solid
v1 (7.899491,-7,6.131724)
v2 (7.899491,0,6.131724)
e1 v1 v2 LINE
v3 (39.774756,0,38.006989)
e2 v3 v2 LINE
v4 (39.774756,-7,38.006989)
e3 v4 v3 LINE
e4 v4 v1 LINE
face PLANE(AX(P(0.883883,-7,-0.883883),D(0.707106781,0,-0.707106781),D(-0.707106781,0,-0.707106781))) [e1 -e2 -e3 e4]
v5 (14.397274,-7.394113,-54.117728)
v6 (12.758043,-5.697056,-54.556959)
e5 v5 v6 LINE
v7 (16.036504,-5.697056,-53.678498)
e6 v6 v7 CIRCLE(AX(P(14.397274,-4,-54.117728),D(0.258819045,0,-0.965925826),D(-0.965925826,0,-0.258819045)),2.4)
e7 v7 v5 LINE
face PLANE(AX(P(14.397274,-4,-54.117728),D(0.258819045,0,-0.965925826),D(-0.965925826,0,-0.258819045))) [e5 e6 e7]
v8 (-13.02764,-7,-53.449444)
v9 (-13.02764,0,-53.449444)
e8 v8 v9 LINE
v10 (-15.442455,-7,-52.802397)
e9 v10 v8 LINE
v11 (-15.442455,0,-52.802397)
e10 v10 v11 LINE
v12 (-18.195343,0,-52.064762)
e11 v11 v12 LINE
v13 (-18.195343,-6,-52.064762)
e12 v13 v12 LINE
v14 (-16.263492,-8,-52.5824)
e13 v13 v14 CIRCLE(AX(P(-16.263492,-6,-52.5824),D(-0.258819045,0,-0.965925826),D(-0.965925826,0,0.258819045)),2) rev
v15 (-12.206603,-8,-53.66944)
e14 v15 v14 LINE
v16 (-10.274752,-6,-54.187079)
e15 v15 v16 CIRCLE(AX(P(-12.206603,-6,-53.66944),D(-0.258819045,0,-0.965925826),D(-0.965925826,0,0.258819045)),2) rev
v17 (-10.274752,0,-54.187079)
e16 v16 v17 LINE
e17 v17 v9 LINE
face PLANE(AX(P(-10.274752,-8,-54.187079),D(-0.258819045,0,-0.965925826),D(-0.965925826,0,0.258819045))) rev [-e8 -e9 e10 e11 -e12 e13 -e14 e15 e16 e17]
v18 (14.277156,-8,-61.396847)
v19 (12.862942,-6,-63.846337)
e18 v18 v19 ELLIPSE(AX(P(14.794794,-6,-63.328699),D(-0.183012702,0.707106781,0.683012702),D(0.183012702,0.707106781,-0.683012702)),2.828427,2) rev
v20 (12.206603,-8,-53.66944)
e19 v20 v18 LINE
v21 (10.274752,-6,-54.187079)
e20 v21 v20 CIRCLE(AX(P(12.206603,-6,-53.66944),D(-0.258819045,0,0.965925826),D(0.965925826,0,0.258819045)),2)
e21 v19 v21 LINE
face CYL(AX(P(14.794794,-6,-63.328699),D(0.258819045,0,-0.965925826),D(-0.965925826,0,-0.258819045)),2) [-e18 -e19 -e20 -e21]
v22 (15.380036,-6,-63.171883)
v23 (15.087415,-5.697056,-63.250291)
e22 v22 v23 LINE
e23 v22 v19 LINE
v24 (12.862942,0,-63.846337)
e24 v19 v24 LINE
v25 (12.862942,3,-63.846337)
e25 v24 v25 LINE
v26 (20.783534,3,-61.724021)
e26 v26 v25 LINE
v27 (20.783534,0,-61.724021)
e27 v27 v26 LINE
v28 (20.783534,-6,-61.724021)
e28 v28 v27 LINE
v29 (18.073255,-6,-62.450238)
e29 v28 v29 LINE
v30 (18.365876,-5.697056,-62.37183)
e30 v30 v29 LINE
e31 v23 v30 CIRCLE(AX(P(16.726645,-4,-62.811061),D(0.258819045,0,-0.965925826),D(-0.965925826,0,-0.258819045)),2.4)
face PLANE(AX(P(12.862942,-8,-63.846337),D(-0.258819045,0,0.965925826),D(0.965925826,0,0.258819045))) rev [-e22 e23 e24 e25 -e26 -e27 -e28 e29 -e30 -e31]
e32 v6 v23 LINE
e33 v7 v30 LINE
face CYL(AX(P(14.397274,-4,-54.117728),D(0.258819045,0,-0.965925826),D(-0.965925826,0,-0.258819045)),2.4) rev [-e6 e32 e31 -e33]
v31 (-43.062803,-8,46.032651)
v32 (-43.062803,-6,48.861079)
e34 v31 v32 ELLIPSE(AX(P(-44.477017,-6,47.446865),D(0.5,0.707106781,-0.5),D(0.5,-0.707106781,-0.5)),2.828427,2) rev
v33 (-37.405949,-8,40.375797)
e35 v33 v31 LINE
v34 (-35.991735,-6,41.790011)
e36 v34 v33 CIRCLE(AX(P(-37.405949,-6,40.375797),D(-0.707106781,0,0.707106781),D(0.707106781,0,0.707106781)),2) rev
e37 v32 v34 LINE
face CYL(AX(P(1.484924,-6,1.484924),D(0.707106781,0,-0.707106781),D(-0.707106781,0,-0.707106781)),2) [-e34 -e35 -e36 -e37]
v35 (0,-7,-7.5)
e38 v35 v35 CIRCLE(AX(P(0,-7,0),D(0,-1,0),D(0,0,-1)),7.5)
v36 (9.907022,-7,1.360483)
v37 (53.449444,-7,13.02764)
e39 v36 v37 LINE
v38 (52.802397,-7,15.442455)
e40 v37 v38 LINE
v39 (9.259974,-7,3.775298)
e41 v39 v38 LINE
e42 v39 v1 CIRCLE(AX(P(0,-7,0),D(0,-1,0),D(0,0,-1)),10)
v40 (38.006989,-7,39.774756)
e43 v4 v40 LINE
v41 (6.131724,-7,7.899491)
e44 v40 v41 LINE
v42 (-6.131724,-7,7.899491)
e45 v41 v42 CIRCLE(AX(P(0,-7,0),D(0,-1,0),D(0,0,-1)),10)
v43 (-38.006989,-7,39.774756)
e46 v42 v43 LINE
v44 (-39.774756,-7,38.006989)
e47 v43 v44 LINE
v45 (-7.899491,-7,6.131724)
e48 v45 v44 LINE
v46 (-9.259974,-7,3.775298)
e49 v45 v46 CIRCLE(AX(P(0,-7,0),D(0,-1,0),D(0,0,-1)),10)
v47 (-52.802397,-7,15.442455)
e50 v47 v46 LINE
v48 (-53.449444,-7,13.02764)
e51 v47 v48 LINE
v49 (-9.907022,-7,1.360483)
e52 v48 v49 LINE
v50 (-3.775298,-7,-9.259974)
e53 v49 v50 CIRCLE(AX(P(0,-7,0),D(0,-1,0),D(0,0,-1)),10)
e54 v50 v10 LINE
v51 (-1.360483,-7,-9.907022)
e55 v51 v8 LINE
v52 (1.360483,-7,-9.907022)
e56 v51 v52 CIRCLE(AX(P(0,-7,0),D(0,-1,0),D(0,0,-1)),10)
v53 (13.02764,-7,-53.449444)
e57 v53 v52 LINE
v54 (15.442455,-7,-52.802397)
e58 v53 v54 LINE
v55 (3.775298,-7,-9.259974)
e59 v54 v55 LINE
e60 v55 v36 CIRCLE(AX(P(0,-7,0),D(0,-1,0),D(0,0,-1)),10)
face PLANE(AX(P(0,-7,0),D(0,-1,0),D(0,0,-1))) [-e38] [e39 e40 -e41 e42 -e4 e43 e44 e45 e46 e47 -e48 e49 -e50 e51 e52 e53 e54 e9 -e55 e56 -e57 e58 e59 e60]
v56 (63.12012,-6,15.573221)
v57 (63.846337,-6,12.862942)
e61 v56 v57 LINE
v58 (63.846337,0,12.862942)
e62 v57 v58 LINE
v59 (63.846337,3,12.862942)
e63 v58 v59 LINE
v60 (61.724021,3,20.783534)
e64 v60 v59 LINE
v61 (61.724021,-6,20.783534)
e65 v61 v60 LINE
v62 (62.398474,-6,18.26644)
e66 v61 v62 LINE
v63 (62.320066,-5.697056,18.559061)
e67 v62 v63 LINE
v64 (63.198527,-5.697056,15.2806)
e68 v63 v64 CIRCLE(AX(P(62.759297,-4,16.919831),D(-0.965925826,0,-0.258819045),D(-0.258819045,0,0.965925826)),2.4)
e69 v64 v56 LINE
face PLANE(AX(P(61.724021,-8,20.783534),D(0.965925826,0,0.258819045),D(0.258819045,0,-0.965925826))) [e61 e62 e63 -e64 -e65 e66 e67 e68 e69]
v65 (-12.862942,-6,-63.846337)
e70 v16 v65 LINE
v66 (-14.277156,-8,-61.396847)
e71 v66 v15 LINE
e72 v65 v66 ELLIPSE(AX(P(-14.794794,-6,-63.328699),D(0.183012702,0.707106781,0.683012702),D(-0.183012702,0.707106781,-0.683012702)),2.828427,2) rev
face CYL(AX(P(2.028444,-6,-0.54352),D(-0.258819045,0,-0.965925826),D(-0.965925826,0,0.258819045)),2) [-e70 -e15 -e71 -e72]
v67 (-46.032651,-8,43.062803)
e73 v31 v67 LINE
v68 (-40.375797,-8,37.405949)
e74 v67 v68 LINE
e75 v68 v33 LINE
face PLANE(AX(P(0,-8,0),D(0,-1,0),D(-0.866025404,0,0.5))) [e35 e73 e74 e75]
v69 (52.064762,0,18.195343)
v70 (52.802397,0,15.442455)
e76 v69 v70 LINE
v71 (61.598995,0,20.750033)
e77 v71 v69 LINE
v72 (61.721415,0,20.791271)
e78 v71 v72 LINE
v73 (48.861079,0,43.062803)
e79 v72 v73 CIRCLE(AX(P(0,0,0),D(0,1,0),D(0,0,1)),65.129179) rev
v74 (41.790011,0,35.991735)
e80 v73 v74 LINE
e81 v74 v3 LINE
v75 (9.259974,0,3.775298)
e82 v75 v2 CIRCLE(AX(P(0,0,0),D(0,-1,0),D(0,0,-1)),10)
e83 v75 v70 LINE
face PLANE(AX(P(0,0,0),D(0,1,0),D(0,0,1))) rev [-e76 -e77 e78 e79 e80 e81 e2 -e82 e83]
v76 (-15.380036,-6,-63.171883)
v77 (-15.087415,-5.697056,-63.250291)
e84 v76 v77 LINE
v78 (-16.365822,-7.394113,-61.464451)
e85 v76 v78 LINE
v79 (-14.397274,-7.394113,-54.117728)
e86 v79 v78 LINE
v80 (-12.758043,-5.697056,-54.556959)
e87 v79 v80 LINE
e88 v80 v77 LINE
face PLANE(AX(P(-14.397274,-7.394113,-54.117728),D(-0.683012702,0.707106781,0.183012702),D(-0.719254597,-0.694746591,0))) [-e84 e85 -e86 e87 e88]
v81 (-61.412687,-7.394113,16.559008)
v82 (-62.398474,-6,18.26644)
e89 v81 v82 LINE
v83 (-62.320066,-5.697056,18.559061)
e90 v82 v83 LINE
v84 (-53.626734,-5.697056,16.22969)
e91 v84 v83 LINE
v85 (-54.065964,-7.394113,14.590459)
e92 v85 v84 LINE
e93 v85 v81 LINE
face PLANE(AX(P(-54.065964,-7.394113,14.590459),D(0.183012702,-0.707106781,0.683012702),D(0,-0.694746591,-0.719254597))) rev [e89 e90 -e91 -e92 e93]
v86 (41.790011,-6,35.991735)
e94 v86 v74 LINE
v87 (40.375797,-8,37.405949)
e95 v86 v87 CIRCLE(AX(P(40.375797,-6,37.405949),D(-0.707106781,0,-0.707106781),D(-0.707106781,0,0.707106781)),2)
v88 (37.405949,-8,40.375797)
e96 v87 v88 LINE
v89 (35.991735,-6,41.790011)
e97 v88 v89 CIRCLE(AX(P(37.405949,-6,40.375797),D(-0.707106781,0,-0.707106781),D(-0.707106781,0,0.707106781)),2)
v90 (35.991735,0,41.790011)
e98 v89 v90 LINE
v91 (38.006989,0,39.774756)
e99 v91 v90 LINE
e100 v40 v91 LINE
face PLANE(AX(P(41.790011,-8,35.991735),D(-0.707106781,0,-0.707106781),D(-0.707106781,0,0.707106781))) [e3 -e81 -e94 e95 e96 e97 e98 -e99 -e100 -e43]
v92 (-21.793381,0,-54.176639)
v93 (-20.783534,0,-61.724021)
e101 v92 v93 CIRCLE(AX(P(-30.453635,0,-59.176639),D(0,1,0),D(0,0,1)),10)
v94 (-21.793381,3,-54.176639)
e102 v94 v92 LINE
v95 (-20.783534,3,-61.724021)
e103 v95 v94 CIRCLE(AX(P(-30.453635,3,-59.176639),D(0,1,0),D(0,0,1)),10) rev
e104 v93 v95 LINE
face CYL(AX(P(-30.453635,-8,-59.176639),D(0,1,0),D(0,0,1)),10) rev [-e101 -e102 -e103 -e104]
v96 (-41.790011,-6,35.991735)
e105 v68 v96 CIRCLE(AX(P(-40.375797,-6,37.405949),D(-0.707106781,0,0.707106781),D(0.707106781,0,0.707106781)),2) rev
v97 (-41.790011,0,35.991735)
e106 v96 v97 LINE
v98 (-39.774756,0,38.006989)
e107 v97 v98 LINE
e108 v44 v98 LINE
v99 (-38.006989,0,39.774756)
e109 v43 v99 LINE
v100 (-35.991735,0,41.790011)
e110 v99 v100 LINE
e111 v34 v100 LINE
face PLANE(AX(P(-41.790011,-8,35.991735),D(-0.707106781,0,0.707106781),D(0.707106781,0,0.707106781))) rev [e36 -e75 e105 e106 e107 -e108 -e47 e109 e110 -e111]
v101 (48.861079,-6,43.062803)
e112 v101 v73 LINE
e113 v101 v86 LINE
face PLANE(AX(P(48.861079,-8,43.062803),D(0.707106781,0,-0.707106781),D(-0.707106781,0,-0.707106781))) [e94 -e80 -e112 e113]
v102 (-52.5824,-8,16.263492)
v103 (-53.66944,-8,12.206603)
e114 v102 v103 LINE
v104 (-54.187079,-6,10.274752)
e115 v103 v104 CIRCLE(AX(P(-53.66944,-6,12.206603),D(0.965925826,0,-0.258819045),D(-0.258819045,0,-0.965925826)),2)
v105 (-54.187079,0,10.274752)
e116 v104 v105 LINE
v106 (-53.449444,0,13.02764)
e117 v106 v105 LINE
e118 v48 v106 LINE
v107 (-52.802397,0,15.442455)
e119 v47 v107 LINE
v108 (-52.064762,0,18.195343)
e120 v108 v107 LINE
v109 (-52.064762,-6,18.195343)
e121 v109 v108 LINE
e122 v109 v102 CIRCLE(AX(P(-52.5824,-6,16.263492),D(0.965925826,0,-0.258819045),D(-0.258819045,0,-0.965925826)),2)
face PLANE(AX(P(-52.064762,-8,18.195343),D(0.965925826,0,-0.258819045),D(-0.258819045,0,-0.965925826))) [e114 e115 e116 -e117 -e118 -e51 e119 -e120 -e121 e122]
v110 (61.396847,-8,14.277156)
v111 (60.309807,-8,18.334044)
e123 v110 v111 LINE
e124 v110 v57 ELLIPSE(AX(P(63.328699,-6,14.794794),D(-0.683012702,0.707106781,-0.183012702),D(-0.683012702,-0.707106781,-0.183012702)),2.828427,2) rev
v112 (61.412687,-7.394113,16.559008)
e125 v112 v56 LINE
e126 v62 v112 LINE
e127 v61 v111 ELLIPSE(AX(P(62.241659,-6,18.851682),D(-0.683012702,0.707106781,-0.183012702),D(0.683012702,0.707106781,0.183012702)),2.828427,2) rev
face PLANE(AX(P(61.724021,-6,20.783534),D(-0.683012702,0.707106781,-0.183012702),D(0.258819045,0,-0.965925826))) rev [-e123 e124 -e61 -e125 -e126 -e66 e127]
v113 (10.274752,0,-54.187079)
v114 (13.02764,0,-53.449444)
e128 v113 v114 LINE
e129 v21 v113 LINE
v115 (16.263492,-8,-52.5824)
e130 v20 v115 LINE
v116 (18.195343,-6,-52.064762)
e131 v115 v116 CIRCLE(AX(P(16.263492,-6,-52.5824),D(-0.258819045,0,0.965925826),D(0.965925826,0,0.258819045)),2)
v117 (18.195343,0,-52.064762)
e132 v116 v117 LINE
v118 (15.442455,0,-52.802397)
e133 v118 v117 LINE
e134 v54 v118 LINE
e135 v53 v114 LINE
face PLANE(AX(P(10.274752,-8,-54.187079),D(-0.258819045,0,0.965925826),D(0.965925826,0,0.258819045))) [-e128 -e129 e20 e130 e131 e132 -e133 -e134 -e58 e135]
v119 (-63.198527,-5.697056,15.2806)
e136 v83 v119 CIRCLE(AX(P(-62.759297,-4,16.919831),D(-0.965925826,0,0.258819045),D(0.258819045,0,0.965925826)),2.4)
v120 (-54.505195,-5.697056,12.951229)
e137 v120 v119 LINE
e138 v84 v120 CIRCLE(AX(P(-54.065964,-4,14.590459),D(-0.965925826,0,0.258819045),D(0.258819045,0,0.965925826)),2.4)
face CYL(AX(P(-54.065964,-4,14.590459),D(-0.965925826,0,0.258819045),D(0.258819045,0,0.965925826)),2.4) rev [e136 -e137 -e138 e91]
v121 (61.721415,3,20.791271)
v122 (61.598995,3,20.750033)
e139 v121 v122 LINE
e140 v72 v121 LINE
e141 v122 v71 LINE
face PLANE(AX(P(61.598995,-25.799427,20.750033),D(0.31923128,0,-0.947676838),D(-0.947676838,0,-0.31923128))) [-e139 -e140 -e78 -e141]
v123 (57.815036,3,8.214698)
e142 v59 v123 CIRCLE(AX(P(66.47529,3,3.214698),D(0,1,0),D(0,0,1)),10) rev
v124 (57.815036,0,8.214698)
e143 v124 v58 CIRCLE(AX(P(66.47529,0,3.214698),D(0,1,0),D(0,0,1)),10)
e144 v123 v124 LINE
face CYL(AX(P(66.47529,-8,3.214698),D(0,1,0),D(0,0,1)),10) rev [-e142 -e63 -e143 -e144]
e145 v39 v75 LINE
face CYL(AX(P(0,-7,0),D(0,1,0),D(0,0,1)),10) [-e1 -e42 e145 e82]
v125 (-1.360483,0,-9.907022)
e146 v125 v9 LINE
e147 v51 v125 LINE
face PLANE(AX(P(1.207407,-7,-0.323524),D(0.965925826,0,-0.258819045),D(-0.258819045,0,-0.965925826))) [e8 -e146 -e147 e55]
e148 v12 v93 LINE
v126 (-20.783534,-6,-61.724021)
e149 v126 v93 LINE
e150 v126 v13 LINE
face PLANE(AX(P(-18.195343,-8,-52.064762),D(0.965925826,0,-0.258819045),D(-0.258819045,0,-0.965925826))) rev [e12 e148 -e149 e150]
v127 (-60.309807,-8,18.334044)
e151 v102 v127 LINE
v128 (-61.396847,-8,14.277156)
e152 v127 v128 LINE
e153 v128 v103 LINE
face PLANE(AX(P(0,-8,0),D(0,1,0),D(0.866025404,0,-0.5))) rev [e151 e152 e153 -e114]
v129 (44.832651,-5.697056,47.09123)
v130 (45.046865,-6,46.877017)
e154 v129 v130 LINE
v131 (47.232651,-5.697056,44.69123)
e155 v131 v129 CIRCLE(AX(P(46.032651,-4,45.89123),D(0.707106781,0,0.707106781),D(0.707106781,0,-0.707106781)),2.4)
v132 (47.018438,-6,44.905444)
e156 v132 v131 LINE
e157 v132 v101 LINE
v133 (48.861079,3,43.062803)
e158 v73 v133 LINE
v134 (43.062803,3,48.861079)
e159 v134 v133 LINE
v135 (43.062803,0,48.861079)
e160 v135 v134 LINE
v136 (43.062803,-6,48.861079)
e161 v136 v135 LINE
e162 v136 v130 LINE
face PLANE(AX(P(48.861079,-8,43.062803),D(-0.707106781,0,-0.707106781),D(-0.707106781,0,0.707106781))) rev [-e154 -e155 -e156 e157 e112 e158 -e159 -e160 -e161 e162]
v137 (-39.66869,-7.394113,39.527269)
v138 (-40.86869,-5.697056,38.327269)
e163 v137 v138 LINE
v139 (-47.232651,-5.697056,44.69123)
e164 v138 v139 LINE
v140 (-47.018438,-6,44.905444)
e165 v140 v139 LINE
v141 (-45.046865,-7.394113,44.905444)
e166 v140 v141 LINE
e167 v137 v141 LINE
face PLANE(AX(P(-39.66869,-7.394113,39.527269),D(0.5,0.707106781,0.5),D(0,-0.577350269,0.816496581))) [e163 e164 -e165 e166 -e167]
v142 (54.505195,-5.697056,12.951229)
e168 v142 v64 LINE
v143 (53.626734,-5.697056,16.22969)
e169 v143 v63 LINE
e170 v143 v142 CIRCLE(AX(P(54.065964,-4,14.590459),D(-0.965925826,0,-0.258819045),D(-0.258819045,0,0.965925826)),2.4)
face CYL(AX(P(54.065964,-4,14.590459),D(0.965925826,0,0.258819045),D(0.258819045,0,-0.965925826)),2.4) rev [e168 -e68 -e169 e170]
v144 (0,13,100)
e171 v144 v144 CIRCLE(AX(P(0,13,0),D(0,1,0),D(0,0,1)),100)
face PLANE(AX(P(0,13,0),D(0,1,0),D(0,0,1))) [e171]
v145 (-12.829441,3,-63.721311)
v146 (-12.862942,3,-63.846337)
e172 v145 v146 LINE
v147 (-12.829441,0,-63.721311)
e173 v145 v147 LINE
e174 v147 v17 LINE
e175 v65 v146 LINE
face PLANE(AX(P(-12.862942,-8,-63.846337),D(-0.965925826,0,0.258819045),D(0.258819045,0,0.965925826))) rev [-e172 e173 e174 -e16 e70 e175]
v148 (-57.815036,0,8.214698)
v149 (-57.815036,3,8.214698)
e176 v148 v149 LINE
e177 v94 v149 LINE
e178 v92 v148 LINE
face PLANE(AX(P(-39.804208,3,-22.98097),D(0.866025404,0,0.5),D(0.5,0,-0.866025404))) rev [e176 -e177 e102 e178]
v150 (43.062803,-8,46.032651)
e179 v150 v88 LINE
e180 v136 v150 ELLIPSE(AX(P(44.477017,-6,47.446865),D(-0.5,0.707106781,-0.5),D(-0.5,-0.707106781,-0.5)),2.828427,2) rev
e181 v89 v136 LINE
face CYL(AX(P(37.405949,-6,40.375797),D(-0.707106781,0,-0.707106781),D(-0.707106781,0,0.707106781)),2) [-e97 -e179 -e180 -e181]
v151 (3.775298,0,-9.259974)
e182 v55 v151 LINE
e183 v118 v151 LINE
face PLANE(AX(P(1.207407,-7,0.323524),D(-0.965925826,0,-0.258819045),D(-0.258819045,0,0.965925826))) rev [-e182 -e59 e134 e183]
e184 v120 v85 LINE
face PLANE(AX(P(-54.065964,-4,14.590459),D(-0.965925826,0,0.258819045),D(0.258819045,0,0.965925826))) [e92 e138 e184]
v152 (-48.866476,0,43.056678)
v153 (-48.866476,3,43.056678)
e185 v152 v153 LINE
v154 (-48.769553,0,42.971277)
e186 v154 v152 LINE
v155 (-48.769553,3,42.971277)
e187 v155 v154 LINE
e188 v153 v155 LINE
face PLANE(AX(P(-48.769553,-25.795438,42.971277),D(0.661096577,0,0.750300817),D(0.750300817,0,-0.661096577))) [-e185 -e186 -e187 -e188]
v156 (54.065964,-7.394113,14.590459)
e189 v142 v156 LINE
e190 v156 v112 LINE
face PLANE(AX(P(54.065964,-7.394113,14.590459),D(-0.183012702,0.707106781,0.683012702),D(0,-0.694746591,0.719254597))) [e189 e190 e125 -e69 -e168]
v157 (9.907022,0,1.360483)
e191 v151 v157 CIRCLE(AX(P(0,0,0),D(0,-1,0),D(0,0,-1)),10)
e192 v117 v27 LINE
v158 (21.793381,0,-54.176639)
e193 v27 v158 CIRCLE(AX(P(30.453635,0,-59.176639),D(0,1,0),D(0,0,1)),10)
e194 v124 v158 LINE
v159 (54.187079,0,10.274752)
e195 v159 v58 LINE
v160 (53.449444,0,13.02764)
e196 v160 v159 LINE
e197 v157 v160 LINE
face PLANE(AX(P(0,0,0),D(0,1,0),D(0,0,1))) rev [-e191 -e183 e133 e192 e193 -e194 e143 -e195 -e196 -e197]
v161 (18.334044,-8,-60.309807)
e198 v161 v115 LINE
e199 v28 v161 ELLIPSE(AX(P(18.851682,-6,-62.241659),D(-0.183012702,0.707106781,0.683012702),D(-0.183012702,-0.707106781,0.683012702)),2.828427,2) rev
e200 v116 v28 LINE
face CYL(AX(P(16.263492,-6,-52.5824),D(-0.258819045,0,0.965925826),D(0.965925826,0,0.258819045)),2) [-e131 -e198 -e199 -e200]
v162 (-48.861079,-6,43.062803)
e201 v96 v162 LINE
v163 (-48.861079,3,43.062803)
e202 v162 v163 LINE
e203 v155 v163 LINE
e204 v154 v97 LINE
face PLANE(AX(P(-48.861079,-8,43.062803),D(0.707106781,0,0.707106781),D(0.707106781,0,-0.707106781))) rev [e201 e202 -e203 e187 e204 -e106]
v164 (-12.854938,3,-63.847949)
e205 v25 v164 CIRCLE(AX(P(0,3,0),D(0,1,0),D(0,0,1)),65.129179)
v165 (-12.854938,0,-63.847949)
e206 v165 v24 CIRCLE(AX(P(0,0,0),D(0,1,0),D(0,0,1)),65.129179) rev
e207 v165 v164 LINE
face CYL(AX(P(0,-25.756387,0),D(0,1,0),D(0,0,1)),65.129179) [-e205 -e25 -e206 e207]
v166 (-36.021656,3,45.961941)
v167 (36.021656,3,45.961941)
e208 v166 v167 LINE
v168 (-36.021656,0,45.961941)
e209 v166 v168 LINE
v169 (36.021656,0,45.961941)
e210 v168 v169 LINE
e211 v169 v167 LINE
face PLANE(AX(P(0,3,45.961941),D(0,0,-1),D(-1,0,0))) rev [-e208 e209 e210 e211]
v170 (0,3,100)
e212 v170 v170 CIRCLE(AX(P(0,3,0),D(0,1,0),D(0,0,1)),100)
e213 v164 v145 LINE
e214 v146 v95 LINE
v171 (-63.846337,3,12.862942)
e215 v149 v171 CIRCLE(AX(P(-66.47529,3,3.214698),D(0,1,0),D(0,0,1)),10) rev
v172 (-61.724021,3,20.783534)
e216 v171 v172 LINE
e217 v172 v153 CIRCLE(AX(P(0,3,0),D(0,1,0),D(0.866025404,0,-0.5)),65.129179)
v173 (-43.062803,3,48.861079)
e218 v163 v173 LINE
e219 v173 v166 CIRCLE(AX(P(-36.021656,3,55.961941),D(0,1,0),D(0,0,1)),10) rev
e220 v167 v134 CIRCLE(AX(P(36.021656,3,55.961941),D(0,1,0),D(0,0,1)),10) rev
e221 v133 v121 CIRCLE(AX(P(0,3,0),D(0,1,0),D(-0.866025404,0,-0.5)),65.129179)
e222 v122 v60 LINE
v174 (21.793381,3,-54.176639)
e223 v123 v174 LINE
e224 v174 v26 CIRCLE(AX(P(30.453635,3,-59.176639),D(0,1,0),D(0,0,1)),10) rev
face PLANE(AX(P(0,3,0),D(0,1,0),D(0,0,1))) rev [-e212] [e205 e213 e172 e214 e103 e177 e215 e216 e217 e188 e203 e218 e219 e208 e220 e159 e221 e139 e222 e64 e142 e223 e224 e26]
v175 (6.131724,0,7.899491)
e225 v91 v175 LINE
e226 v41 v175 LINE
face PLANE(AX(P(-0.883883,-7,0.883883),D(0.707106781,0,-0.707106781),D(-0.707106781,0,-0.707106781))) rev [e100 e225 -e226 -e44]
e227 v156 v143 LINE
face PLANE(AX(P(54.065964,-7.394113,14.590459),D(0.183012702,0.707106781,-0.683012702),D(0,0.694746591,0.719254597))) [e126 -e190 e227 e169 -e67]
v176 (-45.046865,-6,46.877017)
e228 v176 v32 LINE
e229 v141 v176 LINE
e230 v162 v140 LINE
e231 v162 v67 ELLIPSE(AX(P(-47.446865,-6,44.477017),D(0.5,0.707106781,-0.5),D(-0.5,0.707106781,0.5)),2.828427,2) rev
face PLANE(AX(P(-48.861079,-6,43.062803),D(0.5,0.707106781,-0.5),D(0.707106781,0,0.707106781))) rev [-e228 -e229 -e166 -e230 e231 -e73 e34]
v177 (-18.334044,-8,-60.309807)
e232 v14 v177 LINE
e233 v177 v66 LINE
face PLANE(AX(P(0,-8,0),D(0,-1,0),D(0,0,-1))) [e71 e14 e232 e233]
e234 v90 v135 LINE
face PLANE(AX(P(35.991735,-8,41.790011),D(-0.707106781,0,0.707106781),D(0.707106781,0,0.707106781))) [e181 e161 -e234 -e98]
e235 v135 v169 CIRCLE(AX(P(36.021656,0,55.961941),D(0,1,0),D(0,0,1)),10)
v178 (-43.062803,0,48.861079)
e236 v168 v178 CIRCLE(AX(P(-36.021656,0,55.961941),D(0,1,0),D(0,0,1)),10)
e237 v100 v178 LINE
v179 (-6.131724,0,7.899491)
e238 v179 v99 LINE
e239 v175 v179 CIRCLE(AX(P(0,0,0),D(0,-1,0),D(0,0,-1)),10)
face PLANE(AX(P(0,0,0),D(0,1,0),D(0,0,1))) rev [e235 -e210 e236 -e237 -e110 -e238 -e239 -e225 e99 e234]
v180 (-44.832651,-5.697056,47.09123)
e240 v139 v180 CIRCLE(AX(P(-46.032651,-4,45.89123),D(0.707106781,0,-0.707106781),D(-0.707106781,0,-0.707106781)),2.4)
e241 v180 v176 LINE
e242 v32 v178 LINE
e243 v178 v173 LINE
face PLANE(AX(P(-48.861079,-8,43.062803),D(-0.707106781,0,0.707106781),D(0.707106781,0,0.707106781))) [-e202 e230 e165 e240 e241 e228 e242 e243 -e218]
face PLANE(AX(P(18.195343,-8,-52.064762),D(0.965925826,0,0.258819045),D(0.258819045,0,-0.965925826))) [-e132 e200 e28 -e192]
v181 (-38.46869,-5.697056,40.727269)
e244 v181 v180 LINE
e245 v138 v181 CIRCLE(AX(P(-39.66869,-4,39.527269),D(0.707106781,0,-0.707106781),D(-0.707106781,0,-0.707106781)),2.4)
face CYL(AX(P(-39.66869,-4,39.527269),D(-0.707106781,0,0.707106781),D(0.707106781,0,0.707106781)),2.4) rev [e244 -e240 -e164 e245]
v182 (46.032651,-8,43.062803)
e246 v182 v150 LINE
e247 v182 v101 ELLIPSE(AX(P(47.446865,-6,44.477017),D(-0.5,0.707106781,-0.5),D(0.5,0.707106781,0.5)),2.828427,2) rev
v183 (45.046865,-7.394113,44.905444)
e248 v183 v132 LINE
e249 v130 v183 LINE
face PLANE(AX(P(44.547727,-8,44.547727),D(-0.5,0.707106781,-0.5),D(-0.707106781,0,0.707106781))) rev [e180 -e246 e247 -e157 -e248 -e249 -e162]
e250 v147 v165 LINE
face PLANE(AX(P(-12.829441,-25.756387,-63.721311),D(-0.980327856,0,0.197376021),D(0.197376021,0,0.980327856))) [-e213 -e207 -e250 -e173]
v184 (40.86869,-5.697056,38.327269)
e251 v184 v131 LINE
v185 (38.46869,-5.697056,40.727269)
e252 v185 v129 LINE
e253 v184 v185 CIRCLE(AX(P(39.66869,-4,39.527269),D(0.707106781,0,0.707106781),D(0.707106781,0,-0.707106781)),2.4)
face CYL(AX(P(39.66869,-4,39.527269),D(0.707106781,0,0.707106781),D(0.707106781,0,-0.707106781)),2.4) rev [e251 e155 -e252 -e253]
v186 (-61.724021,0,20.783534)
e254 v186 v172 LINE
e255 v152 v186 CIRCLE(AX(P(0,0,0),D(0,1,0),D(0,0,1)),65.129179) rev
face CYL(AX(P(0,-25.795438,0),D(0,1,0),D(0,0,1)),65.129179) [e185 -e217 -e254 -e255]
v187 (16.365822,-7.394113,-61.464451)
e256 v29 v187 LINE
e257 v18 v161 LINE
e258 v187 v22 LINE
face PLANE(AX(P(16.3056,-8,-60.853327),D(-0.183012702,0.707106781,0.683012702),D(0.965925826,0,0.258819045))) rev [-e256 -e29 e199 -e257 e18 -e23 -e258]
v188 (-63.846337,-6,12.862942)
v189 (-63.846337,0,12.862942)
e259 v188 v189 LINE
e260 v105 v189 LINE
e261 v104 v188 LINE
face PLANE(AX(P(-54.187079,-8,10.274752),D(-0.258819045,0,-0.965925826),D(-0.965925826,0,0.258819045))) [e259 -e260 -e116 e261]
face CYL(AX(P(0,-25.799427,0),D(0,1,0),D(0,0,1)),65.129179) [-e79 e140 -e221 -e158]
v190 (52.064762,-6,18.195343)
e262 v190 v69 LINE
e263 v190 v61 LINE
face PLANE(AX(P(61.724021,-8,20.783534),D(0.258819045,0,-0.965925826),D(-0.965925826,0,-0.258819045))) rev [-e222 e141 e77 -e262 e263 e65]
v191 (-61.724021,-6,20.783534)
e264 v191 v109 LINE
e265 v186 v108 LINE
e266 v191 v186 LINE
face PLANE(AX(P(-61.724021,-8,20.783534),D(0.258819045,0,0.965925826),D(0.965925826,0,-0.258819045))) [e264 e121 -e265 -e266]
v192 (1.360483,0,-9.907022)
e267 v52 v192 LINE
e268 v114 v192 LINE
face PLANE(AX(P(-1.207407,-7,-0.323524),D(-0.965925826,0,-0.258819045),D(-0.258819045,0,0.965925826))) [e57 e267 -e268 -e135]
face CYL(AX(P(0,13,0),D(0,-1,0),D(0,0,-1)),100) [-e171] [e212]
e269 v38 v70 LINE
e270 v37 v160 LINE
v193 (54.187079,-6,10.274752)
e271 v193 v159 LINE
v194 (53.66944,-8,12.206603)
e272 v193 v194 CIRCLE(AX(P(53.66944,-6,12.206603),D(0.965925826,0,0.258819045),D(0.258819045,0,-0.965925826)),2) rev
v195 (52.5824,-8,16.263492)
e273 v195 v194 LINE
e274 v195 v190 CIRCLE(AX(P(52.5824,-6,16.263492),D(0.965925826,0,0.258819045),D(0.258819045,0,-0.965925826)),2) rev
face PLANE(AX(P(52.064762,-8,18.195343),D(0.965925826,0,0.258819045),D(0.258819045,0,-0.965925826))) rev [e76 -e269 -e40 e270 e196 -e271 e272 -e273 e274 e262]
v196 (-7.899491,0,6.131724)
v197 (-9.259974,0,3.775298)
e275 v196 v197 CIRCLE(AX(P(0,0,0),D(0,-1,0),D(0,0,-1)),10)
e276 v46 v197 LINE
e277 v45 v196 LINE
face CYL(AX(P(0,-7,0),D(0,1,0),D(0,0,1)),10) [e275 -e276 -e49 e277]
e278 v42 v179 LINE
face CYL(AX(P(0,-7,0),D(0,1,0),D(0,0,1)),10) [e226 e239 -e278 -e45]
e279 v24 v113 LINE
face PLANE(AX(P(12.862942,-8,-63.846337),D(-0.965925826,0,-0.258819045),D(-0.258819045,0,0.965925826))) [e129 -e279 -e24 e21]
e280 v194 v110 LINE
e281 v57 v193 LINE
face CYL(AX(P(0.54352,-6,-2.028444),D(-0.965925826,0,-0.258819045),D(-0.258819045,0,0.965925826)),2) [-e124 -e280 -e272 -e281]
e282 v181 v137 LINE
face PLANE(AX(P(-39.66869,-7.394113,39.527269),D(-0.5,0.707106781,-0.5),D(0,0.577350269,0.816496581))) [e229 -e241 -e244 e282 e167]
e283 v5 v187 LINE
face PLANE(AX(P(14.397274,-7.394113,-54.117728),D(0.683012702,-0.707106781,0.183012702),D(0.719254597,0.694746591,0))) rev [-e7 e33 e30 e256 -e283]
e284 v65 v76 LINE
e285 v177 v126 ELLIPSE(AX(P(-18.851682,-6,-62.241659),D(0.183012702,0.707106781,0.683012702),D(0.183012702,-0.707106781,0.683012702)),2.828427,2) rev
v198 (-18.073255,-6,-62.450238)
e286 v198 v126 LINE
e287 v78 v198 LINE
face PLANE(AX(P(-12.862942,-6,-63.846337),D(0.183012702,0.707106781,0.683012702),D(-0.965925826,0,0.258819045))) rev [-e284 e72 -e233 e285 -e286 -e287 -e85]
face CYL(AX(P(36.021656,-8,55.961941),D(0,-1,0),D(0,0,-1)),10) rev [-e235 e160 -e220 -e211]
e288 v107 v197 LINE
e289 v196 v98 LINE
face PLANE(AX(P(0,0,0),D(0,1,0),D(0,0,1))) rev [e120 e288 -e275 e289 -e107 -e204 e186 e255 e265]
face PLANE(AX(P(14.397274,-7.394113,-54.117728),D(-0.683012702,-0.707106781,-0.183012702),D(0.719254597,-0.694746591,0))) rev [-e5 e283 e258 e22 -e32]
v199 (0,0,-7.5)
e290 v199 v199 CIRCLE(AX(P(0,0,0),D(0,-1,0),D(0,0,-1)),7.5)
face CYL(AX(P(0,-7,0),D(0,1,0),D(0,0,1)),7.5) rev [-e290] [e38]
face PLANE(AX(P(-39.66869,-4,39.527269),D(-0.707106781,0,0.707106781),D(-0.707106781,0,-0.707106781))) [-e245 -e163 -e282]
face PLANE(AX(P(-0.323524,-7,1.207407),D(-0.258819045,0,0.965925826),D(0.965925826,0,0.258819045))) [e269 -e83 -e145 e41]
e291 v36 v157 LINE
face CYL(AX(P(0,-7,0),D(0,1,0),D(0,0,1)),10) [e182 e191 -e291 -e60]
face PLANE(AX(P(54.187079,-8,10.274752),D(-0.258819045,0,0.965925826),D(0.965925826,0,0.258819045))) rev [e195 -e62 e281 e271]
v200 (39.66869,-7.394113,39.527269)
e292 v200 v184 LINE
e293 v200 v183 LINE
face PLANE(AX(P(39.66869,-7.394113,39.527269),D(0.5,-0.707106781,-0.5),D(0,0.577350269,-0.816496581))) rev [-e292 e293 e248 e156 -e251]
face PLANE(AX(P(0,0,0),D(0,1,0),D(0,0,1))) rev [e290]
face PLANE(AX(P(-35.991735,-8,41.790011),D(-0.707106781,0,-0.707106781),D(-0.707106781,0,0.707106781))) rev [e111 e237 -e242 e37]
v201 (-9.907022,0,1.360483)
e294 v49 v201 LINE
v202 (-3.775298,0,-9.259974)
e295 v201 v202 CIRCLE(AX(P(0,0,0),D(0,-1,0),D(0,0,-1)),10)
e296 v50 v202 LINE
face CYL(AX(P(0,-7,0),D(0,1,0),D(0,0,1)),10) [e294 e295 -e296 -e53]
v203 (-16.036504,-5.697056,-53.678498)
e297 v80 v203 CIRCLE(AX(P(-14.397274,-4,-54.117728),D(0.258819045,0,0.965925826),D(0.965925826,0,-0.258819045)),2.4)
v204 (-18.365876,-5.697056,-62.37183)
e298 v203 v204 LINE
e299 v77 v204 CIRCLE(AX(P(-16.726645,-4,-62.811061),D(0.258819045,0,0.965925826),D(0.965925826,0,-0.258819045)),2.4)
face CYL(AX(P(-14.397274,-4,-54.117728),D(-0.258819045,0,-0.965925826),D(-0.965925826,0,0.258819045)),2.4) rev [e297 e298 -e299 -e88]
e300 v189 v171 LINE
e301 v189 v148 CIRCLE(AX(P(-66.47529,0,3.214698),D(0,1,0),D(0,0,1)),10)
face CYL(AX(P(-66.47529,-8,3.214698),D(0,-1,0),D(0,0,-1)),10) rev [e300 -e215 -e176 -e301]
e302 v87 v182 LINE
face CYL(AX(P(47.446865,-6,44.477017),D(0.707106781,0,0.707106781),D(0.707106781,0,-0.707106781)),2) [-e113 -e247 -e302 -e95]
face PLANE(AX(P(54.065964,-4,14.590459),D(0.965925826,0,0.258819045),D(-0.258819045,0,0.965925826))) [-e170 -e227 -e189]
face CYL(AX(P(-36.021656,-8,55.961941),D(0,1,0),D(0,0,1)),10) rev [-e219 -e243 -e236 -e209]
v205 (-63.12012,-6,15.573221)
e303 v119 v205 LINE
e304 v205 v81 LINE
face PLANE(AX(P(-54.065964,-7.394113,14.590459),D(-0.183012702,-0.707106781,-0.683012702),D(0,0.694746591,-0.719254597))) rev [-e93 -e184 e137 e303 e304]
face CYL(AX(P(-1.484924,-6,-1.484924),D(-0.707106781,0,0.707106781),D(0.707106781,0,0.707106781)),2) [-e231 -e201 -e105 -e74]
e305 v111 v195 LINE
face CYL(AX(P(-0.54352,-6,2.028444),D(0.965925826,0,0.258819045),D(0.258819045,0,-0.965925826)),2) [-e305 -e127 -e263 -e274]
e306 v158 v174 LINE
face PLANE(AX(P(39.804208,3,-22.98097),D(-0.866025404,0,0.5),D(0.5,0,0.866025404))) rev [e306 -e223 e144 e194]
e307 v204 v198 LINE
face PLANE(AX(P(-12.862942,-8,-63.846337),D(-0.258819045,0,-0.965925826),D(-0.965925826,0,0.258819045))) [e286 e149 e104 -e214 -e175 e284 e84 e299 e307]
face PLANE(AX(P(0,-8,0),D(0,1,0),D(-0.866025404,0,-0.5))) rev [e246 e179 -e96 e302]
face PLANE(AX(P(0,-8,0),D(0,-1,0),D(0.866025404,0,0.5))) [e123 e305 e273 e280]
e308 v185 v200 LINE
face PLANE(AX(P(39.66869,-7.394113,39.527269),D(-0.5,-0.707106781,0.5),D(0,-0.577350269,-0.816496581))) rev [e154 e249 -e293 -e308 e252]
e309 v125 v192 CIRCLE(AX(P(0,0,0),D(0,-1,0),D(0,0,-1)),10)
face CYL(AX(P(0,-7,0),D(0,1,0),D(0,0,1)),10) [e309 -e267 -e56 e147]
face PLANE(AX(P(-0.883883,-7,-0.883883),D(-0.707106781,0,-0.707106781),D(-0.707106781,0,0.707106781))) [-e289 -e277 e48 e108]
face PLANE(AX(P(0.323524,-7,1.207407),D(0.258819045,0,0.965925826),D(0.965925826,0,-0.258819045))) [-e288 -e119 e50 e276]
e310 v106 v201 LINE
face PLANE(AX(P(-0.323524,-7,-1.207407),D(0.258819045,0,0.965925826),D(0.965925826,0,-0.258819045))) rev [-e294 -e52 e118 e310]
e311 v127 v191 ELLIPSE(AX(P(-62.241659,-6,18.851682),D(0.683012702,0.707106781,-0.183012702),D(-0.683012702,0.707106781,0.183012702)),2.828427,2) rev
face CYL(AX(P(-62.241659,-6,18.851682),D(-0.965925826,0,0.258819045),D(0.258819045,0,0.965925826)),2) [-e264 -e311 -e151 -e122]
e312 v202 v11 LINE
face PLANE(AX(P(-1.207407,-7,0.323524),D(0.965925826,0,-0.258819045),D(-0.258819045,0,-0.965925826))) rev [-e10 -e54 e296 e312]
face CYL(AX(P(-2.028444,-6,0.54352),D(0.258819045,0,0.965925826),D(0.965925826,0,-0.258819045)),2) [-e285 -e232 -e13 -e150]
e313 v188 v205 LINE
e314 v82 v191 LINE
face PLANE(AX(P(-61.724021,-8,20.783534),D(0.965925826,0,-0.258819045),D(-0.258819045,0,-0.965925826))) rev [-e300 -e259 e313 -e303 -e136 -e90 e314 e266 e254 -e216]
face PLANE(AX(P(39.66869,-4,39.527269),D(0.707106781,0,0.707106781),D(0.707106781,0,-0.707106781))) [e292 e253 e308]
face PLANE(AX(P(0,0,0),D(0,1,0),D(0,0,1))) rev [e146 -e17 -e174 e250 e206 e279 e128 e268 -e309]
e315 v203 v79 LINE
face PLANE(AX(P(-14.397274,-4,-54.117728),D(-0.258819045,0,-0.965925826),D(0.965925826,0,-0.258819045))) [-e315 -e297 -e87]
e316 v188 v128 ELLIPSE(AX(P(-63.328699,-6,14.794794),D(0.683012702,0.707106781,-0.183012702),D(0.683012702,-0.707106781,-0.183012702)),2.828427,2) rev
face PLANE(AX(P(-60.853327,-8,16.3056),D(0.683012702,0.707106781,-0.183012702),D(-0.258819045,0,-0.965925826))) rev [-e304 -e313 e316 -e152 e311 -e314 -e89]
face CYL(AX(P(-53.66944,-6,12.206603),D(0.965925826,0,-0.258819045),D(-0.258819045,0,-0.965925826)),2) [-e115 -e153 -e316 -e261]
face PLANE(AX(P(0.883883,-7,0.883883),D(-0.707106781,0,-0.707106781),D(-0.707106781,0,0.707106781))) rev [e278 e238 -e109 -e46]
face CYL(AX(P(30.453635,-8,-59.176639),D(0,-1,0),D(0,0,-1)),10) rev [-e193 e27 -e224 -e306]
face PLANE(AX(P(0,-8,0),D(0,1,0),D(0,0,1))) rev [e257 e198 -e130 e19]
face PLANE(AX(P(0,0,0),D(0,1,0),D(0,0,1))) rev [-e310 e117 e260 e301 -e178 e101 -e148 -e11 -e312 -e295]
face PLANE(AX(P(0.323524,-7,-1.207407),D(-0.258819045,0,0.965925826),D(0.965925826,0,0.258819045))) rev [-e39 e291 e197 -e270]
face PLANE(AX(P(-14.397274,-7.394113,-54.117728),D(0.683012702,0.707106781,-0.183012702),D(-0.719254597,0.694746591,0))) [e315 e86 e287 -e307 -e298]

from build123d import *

# Parameters (mm, degrees)
EXTRUDE_1_DEPTH                      = 3
EXTRUDE_3_DEPTH                      = 8
CUT_EXTRUDE_3_DEPTH                  = 9
EXTRUDE_4_DEPTH                      = 3
EXTRUDE_START                        = -3
EXTRUDE_5_DEPTH                      = 3
CHAMFER_1_SIZE                       = 2
FILLET_1_R                           = 2
PATTERN_CIRCULAR_3_COUNT             = 3
PATTERN_CIRCULAR_3_COPY_1_DEPTH      = 9
PATTERN_CIRCULAR_3_COPY_2_DEPTH      = 9
CHAMFER_1_OF_PATTERN_CIRCULAR_3_SIZE = 2
FILLET_1_OF_PATTERN_CIRCULAR_3_R     = 2
SKETCH_8_R                           = 10
SKETCH_8_R_2                         = 7.5
EXTRUDE_6_DEPTH                      = 7
FILLET_2_R                           = 10
SKETCH_11_R                          = 100
EXTRUDE_7_DEPTH                      = 10


with BuildPart() as part:
    # 草圖1 → 填料-伸長1 (new body)
    with BuildSketch(Plane(origin=(0, 0, 0), x_dir=(1, 0, 0), z_dir=(0, 1, 0))):
        Polygon((0, 0), (-16.823237932, 62.785178709), (-62.785178709, -16.823237932), align=None)
        with BuildLine():
            Line((0, 65), (0, 0))
            Line((0, 0), (16.823237932, 62.785178709))
            ThreePointArc((16.823237932, 62.785178709), (8.484202494, 64.443915989), (0, 65))
        make_face()
        with BuildLine():
            Line((-16.823237932, 62.785178709), (0, 0))
            Line((0, 0), (0, 65))
            ThreePointArc((0, 65), (-8.484202494, 64.443915989), (-16.823237932, 62.785178709))
        make_face()
        Polygon((0, 0), (62.785178709, -16.823237932), (16.823237932, 62.785178709), align=None)
        with BuildLine():
            Line((0, 0), (45.961940777, -45.961940777))
            ThreePointArc((45.961940777, -45.961940777), (56.291651246, -32.5), (62.785178709, -16.823237932))
            Line((62.785178709, -16.823237932), (0, 0))
        make_face()
        Polygon((0, 0), (0, -45.961940777), (45.961940777, -45.961940777), align=None)
        Polygon((-45.961940777, -45.961940777), (0, -45.961940777), (0, 0), align=None)
        with BuildLine():
            Line((0, 0), (-62.785178709, -16.823237932))
            ThreePointArc((-62.785178709, -16.823237932), (-56.291651246, -32.5), (-45.961940777, -45.961940777))
            Line((-45.961940777, -45.961940777), (0, 0))
        make_face()
    extrude(amount=EXTRUDE_1_DEPTH)

    # 草圖2 → 填料-伸長3 (add)
    with BuildSketch(Plane.XZ):
        Polygon((12.862942044, -63.846336794), (20.783533819, -61.724020624), (18.195343368, -52.064762361), (10.274751593, -54.187078531), align=None)
        Polygon((-10.274751593, -54.187078531), (-18.195343368, -52.064762361), (-20.783533819, -61.724020624), (-12.862942044, -63.846336794), align=None)
    extrude_3 = extrude(amount=EXTRUDE_3_DEPTH)

    # 草圖5 → 除料-伸長3 (cut)
    with BuildSketch(Plane(origin=(16.823237932, 0, -62.785178709), x_dir=(-0.9659258262890813, 0, -0.2588190451024721), z_dir=(0.2588190451024721, 0, -0.9659258262890813))):
        with BuildLine():
            Line((0.1, -7.39411255), (1.797056275, -5.697056275))
            ThreePointArc((1.797056275, -5.697056275), (0.1, -1.6), (-1.597056275, -5.697056275))
            Line((-1.597056275, -5.697056275), (0.1, -7.39411255))
        make_face()
    cut_extrude_3 = extrude(amount=-CUT_EXTRUDE_3_DEPTH, mode=Mode.SUBTRACT)

    # 鏡射1: 除料-伸長3 across plane
    add(cut_extrude_3.mirror(Plane(origin=(0, 0, 0), x_dir=(0, 0, 1), z_dir=(1, 0, 0))), mode=Mode.SUBTRACT)

    # 草圖6 → 填料-伸長4 (add)
    with BuildSketch(Plane(origin=(0, 0, 0), x_dir=(1, 0, 0), z_dir=(0, 1, 0))):
        with BuildLine():
            ThreePointArc((12.829441395, 63.72131067), (14.83372622, 63.284757773), (16.823237932, 62.785178709))
            Line((16.823237932, 62.785178709), (12.862942044, 63.846336794))
            Line((12.862942044, 63.846336794), (12.829441395, 63.72131067))
        make_face()
        Polygon((20.783533819, 61.724020624), (16.823237932, 62.785178709), (19.722375735, 57.763724736), align=None)
        with BuildLine():
            Line((-12.829441395, 63.72131067), (-12.862942044, 63.846336794))
            Line((-12.862942044, 63.846336794), (-16.823237932, 62.785178709))
            ThreePointArc((-16.823237932, 62.785178709), (-14.83372622, 63.284757773), (-12.829441395, 63.72131067))
        make_face()
        Polygon((-19.722375735, 57.763724736), (-16.823237932, 62.785178709), (-20.783533819, 61.724020624), align=None)
    extrude_4 = extrude(amount=EXTRUDE_4_DEPTH)

    # 草圖7 → 填料-伸長5 (add)
    with BuildSketch(Plane(origin=(0, 3, 0), x_dir=(1, 0, 0), z_dir=(0, 1, 0)).offset(EXTRUDE_START)):
        with BuildLine():
            Line((12.829441395, 63.72131067), (12.862942044, 63.846336794))
            ThreePointArc((12.862942044, 63.846336794), (0.00408223, 65.129179201), (-12.854938297, 63.847948764))
            Line((-12.854938297, 63.847948764), (-12.829441395, 63.72131067))
            ThreePointArc((-12.829441395, 63.72131067), (0, 65), (12.829441395, 63.72131067))
        make_face()
    extrude_5 = extrude(amount=EXTRUDE_5_DEPTH)

    # 導角1
    # the kernel refuses this chamfer: 2 mm, written as the material it takes off along each edge
    with BuildSketch(Plane(origin=(7.894832014, -8, -65.177537864), x_dir=(-0.2587211899984849, -0.027495876610586514, 0.9655606260692197), z_dir=(0.9659258262890813, 0, 0.2588190451024725))) as chamfer_1_piece_1:
        Polygon((CHAMFER_1_SIZE * 0.999621916911, -CHAMFER_1_SIZE * 0.0274958766106), (-CHAMFER_1_SIZE * 0.0274958766106, -CHAMFER_1_SIZE * 0.999621916911), (0, 0), align=None)
    extrude(amount=18.486731952, mode=Mode.SUBTRACT)
    with BuildSketch(Plane(origin=(-25.75164385, -8, -60.392819553), x_dir=(-0.007116456528607307, 0.9996219169112968, -0.0265589773346234), z_dir=(0.9659258262890822, 0, -0.25881904510246906))) as chamfer_1_piece_2:
        Polygon((CHAMFER_1_SIZE * 0.999621916911, CHAMFER_1_SIZE * 0.0274958766106), (-CHAMFER_1_SIZE * 0.0274958766106, CHAMFER_1_SIZE * 0.999621916911), (0, 0), align=None)
    extrude(amount=18.486731952, mode=Mode.SUBTRACT)

    # 圓角1
    fillet_1_edges = [part.edges().sort_by_distance(p)[0] for p in [
        (-19.230619549, -8, -55.928465666),
        (-11.310027773, -8, -58.050781836),
        (11.310027773, -8, -58.050781836),
        (19.230619549, -8, -55.928465666),
    ]]
    fillet(fillet_1_edges, radius=FILLET_1_R)

    # 環狀複製排列3: 填料-伸長3, 除料-伸長3, 填料-伸長4, 填料-伸長5 ×3 about axis
    pattern_circular_3_axis = Axis((0, 0, 0), (0, 1, 0))
    add([extrude_3.rotate(pattern_circular_3_axis, i * 360 / PATTERN_CIRCULAR_3_COUNT) for i in range(1, PATTERN_CIRCULAR_3_COUNT)])
    add([cut_extrude_3.rotate(pattern_circular_3_axis, i * 360 / PATTERN_CIRCULAR_3_COUNT) for i in range(1, PATTERN_CIRCULAR_3_COUNT)], mode=Mode.SUBTRACT)
    add([extrude_4.rotate(pattern_circular_3_axis, i * 360 / PATTERN_CIRCULAR_3_COUNT) for i in range(1, PATTERN_CIRCULAR_3_COUNT)])
    add([extrude_5.rotate(pattern_circular_3_axis, i * 360 / PATTERN_CIRCULAR_3_COUNT) for i in range(1, PATTERN_CIRCULAR_3_COUNT)])

    # 環狀複製排列3 copy 1 sketch → 環狀複製排列3 copy 1 (cut)
    with BuildSketch(Plane(origin=(-45.961940777, 0, 45.961940777), x_dir=(-0.7071067811865117, 0, -0.7071067811865832), z_dir=(-0.7071067811865832, 0, 0.7071067811865117))):
        with BuildLine():
            Line((0.1, 7.39411255), (1.797056275, 5.697056275))
            ThreePointArc((1.797056275, 5.697056275), (0.1, 1.6), (-1.597056275, 5.697056275))
            Line((-1.597056275, 5.697056275), (0.1, 7.39411255))
        make_face()
    extrude(amount=-PATTERN_CIRCULAR_3_COPY_1_DEPTH, mode=Mode.SUBTRACT)

    # 環狀複製排列3 copy 2 sketch → 環狀複製排列3 copy 2 (cut)
    with BuildSketch(Plane(origin=(62.785178709, 0, 16.823237932), x_dir=(-0.2588190451025699, 0, 0.9659258262890551), z_dir=(0.9659258262890551, 0, 0.2588190451025699))):
        with BuildLine():
            Line((0.1, 7.39411255), (1.797056275, 5.697056275))
            ThreePointArc((1.797056275, 5.697056275), (0.1, 1.6), (-1.597056275, 5.697056275))
            Line((-1.597056275, 5.697056275), (0.1, 7.39411255))
        make_face()
    extrude(amount=-PATTERN_CIRCULAR_3_COPY_2_DEPTH, mode=Mode.SUBTRACT)

    # 導角1 of 環狀複製排列3
    # the kernel refuses this chamfer: 2 mm, written as the material it takes off along each edge
    with BuildSketch(Plane(origin=(-60.392819553, -8, 25.75164385), x_dir=(-0.026558977334623094, 0.9996219169112968, 0.007116456528610167), z_dir=(-0.25881904510256887, 0, -0.9659258262890554)), Plane(origin=(-39.425894015, -8, 52.49798754), x_dir=(-0.019442520806014836, 0.9996219169112968, 0.019442520806012744), z_dir=(-0.7071067811865095, 0, -0.7071067811865857)), Plane(origin=(52.49798754, -8, 39.425894015), x_dir=(0.01944252080601648, 0.9996219169112968, 0.01944252080601455), z_dir=(-0.7071067811865125, 0, 0.7071067811865825)), Plane(origin=(65.177537864, -8, 7.894832014), x_dir=(0.026558977334623382, 0.9996219169112965, 0.007116456528610366), z_dir=(-0.258819045102573, 0, 0.9659258262890543))) as chamfer_1_of_pattern_circular_3_piece_1:
        Polygon((CHAMFER_1_OF_PATTERN_CIRCULAR_3_SIZE * 0.999621916911, CHAMFER_1_OF_PATTERN_CIRCULAR_3_SIZE * 0.0274958766106), (-CHAMFER_1_OF_PATTERN_CIRCULAR_3_SIZE * 0.0274958766106, CHAMFER_1_OF_PATTERN_CIRCULAR_3_SIZE * 0.999621916911), (0, 0), align=None)
    extrude(amount=18.486731952, mode=Mode.SUBTRACT)

    # 圓角1 of 環狀複製排列3
    fillet_1_of_pattern_circular_3_edges = [part.edges().sort_by_distance(p)[0] for p in [
        (-38.820162287, -8, 44.618437893),
        (-44.618437893, -8, 38.820162287),
        (-55.928465666, -8, 19.230619549),
        (-58.050781836, -8, 11.310027773),
        (58.050781836, -8, 11.310027773),
        (55.928465666, -8, 19.230619549),
        (44.618437893, -8, 38.820162287),
        (38.820162287, -8, 44.618437893),
    ]]
    fillet(fillet_1_of_pattern_circular_3_edges, radius=FILLET_1_OF_PATTERN_CIRCULAR_3_R)

    # 草圖8 → 填料-伸長6 (add)
    # profile 1 of 7: a face of its own
    with BuildSketch(Plane.XZ):
        with BuildLine():
            Line((-39.774756442, 38.006989489), (-7.899491077, 6.131724124))
            ThreePointArc((-7.899491077, 6.131724124), (-7.071067812, 7.071067812), (-6.131724124, 7.899491077))
            Line((-6.131724124, 7.899491077), (-38.006989489, 39.774756442))
            Line((-38.006989489, 39.774756442), (-39.774756442, 38.006989489))
        make_face()
    # profile 2 of 7: a face of its own
    with BuildSketch(Plane.XZ):
        with BuildLine():
            Line((-53.449444252, 13.027640198), (-9.907022011, 1.360483322))
            ThreePointArc((-9.907022011, 1.360483322), (-9.659258263, 2.588190451), (-9.259974398, 3.775297888))
            Line((-9.259974398, 3.775297888), (-52.80239664, 15.442454763))
            Line((-52.80239664, 15.442454763), (-53.449444252, 13.027640198))
        make_face()
    # profile 3 of 7: a face of its own
    with BuildSketch(Plane.XZ):
        with BuildLine():
            ThreePointArc((6.131724124, 7.899491077), (7.071067812, 7.071067812), (7.899491077, 6.131724124))
            Line((7.899491077, 6.131724124), (39.774756442, 38.006989489))
            Line((39.774756442, 38.006989489), (38.006989489, 39.774756442))
            Line((38.006989489, 39.774756442), (6.131724124, 7.899491077))
        make_face()
    # profile 4 of 7: a face of its own
    with BuildSketch(Plane.XZ):
        with BuildLine():
            ThreePointArc((9.259974398, 3.775297888), (9.659258263, 2.588190451), (9.907022011, 1.360483322))
            Line((9.907022011, 1.360483322), (53.449444252, 13.027640198))
            Line((53.449444252, 13.027640198), (52.80239664, 15.442454764))
            Line((52.80239664, 15.442454764), (9.259974398, 3.775297888))
        make_face()
    # profile 5 of 7: a face of its own
    with BuildSketch(Plane.XZ):
        with BuildLine():
            Line((1.360483322, -9.907022011), (13.027640198, -53.449444252))
            Line((13.027640198, -53.449444252), (15.442454764, -52.80239664))
            Line((15.442454764, -52.80239664), (3.775297888, -9.259974398))
            ThreePointArc((3.775297888, -9.259974398), (2.588190451, -9.659258263), (1.360483322, -9.907022011))
        make_face()
    # profile 6 of 7: a face of its own
    with BuildSketch(Plane.XZ):
        with BuildLine():
            Line((-13.027640198, -53.449444252), (-1.360483322, -9.907022011))
            ThreePointArc((-1.360483322, -9.907022011), (-2.588190451, -9.659258263), (-3.775297888, -9.259974398))
            Line((-3.775297888, -9.259974398), (-15.442454763, -52.80239664))
            Line((-15.442454763, -52.80239664), (-13.027640198, -53.449444252))
        make_face()
    # profile 7 of 7: a face of its own
    with BuildSketch(Plane.XZ):
        Circle(SKETCH_8_R)
        with Locations(Location((0, 0, 0), (0, 0, 270))):
            Circle(SKETCH_8_R_2, mode=Mode.SUBTRACT)
    extrude(amount=EXTRUDE_6_DEPTH)

    # 圓角2
    # the kernel refuses this fillet: 10 mm, written as the material it adds along each edge
    with BuildSketch(Plane(origin=(-59.886040906, 0, 11.801783959), x_dir=(-0.9659258262890541, 0, 0.2588190451025734), z_dir=(0, 1, 0))) as fillet_2_piece_1_section:
        with BuildLine():
            CenterArc((FILLET_2_R * 0.414213562371, -FILLET_2_R), FILLET_2_R, 90, 45)
            Line((-FILLET_2_R * 0.292893218815, -FILLET_2_R * 0.292893218813), (0, 0))
            Line((0, 0), (FILLET_2_R * 0.414213562371, 0))
        make_face()
    fillet_2_piece_1 = extrude(amount=3, mode=Mode.PRIVATE)
    fillet_2_piece_1 = split(fillet_2_piece_1, bisect_by=Plane(origin=(-64.006723661, 1.5, 12.264370105), z_dir=(0.9659258262890554, 0, -0.25881904510256887)), keep=Keep.TOP, mode=Mode.PRIVATE)
    add(fillet_2_piece_1)
    with BuildSketch(Plane(origin=(-40.163665171, 0, 45.961940777), x_dir=(-0.707106781186538, 0, 0.7071067811865569), z_dir=(0, 1, 0))) as fillet_2_piece_2_section:
        with BuildLine():
            CenterArc((FILLET_2_R * 0.414213562373, FILLET_2_R), FILLET_2_R, 225, 45)
            Line((-FILLET_2_R * 0.292893218813, FILLET_2_R * 0.292893218813), (0, 0))
            Line((0, 0), (FILLET_2_R * 0.414213562373, 0))
        make_face()
    fillet_2_piece_2 = extrude(amount=3, mode=Mode.PRIVATE)
    fillet_2_piece_2 = split(fillet_2_piece_2, bisect_by=Plane(origin=(-42.624617903, 1.5, 49.299263651), z_dir=(0.7071067811878319, 0, -0.7071067811852634)), keep=Keep.TOP, mode=Mode.PRIVATE)
    add(fillet_2_piece_2)
    with BuildSketch(Plane(origin=(40.163665171, 0, 45.961940777), x_dir=(-1.0, 0, -1.1304498582404621e-12), z_dir=(0, 1, 0))) as fillet_2_piece_3_section:
        with BuildLine():
            CenterArc((FILLET_2_R * 0.414213562372, FILLET_2_R), FILLET_2_R, 225, 45)
            Line((-FILLET_2_R * 0.292893218814, FILLET_2_R * 0.292893218813), (0, 0))
            Line((0, 0), (FILLET_2_R * 0.414213562373, 0))
        make_face()
    fillet_2_piece_3 = extrude(amount=3, mode=Mode.PRIVATE)
    fillet_2_piece_3 = split(fillet_2_piece_3, bisect_by=Plane(origin=(42.624617903, 1.5, 49.299263651), z_dir=(-0.7071067811865825, 0, -0.7071067811865125)), keep=Keep.TOP, mode=Mode.PRIVATE)
    add(fillet_2_piece_3)
    with BuildSketch(Plane(origin=(59.886040906, 0, 11.801783959), x_dir=(0.9659258262890713, 0, 0.25881904510251014), z_dir=(0, 1, 0))) as fillet_2_piece_4_section:
        with BuildLine():
            CenterArc((FILLET_2_R * 0.414213562375, FILLET_2_R), FILLET_2_R, 225, 45)
            Line((-FILLET_2_R * 0.292893218812, FILLET_2_R * 0.292893218813), (0, 0))
            Line((0, 0), (FILLET_2_R * 0.414213562375, 0))
        make_face()
    fillet_2_piece_4 = extrude(amount=3, mode=Mode.PRIVATE)
    fillet_2_piece_4 = split(fillet_2_piece_4, bisect_by=Plane(origin=(64.006723661, 1.5, 12.264370105), z_dir=(-0.9659258262885981, 0, -0.2588190451042754)), keep=Keep.TOP, mode=Mode.PRIVATE)
    add(fillet_2_piece_4)
    with BuildSketch(Plane(origin=(19.722375735, 0, -57.763724736), x_dir=(0.49999999999999933, 0, 0.866025403784439), z_dir=(0, 1, 0))) as fillet_2_piece_5_section:
        with BuildLine():
            CenterArc((FILLET_2_R * 0.414213562373, FILLET_2_R), FILLET_2_R, 225, 45)
            Line((-FILLET_2_R * 0.292893218813, FILLET_2_R * 0.292893218813), (0, 0))
            Line((0, 0), (FILLET_2_R * 0.414213562373, 0))
        make_face()
    fillet_2_piece_5 = extrude(amount=3, mode=Mode.PRIVATE)
    fillet_2_piece_5 = split(fillet_2_piece_5, bisect_by=Plane(origin=(21.382105758, 1.5, -61.563633756), z_dir=(-0.2588190451024714, 0, 0.9659258262890816)), keep=Keep.TOP, mode=Mode.PRIVATE)
    add(fillet_2_piece_5)
    with BuildSketch(Plane(origin=(-19.722375735, 0, -57.763724736), x_dir=(-0.4999999999999984, 0, 0.8660254037844397), z_dir=(0, 1, 0))) as fillet_2_piece_6_section:
        with BuildLine():
            CenterArc((FILLET_2_R * 0.414213562373, -FILLET_2_R), FILLET_2_R, 90, 45)
            Line((-FILLET_2_R * 0.292893218813, -FILLET_2_R * 0.292893218813), (0, 0))
            Line((0, 0), (FILLET_2_R * 0.414213562373, 0))
        make_face()
    fillet_2_piece_6 = extrude(amount=3, mode=Mode.PRIVATE)
    fillet_2_piece_6 = split(fillet_2_piece_6, bisect_by=Plane(origin=(-21.382105758, 1.5, -61.563633756), z_dir=(0.25881904510246906, 0, 0.9659258262890822)), keep=Keep.TOP, mode=Mode.PRIVATE)
    add(fillet_2_piece_6)

    # 草圖11 → 填料-伸長7 (add)
    with BuildSketch(Plane(origin=(0, 3, 0), x_dir=(1, 0, 0), z_dir=(0, 1, 0))):
        with Locations(Location((0, 0, 0), (0, 0, 270))):
            Circle(SKETCH_11_R)
    extrude(amount=EXTRUDE_7_DEPTH)


solid = part.part
